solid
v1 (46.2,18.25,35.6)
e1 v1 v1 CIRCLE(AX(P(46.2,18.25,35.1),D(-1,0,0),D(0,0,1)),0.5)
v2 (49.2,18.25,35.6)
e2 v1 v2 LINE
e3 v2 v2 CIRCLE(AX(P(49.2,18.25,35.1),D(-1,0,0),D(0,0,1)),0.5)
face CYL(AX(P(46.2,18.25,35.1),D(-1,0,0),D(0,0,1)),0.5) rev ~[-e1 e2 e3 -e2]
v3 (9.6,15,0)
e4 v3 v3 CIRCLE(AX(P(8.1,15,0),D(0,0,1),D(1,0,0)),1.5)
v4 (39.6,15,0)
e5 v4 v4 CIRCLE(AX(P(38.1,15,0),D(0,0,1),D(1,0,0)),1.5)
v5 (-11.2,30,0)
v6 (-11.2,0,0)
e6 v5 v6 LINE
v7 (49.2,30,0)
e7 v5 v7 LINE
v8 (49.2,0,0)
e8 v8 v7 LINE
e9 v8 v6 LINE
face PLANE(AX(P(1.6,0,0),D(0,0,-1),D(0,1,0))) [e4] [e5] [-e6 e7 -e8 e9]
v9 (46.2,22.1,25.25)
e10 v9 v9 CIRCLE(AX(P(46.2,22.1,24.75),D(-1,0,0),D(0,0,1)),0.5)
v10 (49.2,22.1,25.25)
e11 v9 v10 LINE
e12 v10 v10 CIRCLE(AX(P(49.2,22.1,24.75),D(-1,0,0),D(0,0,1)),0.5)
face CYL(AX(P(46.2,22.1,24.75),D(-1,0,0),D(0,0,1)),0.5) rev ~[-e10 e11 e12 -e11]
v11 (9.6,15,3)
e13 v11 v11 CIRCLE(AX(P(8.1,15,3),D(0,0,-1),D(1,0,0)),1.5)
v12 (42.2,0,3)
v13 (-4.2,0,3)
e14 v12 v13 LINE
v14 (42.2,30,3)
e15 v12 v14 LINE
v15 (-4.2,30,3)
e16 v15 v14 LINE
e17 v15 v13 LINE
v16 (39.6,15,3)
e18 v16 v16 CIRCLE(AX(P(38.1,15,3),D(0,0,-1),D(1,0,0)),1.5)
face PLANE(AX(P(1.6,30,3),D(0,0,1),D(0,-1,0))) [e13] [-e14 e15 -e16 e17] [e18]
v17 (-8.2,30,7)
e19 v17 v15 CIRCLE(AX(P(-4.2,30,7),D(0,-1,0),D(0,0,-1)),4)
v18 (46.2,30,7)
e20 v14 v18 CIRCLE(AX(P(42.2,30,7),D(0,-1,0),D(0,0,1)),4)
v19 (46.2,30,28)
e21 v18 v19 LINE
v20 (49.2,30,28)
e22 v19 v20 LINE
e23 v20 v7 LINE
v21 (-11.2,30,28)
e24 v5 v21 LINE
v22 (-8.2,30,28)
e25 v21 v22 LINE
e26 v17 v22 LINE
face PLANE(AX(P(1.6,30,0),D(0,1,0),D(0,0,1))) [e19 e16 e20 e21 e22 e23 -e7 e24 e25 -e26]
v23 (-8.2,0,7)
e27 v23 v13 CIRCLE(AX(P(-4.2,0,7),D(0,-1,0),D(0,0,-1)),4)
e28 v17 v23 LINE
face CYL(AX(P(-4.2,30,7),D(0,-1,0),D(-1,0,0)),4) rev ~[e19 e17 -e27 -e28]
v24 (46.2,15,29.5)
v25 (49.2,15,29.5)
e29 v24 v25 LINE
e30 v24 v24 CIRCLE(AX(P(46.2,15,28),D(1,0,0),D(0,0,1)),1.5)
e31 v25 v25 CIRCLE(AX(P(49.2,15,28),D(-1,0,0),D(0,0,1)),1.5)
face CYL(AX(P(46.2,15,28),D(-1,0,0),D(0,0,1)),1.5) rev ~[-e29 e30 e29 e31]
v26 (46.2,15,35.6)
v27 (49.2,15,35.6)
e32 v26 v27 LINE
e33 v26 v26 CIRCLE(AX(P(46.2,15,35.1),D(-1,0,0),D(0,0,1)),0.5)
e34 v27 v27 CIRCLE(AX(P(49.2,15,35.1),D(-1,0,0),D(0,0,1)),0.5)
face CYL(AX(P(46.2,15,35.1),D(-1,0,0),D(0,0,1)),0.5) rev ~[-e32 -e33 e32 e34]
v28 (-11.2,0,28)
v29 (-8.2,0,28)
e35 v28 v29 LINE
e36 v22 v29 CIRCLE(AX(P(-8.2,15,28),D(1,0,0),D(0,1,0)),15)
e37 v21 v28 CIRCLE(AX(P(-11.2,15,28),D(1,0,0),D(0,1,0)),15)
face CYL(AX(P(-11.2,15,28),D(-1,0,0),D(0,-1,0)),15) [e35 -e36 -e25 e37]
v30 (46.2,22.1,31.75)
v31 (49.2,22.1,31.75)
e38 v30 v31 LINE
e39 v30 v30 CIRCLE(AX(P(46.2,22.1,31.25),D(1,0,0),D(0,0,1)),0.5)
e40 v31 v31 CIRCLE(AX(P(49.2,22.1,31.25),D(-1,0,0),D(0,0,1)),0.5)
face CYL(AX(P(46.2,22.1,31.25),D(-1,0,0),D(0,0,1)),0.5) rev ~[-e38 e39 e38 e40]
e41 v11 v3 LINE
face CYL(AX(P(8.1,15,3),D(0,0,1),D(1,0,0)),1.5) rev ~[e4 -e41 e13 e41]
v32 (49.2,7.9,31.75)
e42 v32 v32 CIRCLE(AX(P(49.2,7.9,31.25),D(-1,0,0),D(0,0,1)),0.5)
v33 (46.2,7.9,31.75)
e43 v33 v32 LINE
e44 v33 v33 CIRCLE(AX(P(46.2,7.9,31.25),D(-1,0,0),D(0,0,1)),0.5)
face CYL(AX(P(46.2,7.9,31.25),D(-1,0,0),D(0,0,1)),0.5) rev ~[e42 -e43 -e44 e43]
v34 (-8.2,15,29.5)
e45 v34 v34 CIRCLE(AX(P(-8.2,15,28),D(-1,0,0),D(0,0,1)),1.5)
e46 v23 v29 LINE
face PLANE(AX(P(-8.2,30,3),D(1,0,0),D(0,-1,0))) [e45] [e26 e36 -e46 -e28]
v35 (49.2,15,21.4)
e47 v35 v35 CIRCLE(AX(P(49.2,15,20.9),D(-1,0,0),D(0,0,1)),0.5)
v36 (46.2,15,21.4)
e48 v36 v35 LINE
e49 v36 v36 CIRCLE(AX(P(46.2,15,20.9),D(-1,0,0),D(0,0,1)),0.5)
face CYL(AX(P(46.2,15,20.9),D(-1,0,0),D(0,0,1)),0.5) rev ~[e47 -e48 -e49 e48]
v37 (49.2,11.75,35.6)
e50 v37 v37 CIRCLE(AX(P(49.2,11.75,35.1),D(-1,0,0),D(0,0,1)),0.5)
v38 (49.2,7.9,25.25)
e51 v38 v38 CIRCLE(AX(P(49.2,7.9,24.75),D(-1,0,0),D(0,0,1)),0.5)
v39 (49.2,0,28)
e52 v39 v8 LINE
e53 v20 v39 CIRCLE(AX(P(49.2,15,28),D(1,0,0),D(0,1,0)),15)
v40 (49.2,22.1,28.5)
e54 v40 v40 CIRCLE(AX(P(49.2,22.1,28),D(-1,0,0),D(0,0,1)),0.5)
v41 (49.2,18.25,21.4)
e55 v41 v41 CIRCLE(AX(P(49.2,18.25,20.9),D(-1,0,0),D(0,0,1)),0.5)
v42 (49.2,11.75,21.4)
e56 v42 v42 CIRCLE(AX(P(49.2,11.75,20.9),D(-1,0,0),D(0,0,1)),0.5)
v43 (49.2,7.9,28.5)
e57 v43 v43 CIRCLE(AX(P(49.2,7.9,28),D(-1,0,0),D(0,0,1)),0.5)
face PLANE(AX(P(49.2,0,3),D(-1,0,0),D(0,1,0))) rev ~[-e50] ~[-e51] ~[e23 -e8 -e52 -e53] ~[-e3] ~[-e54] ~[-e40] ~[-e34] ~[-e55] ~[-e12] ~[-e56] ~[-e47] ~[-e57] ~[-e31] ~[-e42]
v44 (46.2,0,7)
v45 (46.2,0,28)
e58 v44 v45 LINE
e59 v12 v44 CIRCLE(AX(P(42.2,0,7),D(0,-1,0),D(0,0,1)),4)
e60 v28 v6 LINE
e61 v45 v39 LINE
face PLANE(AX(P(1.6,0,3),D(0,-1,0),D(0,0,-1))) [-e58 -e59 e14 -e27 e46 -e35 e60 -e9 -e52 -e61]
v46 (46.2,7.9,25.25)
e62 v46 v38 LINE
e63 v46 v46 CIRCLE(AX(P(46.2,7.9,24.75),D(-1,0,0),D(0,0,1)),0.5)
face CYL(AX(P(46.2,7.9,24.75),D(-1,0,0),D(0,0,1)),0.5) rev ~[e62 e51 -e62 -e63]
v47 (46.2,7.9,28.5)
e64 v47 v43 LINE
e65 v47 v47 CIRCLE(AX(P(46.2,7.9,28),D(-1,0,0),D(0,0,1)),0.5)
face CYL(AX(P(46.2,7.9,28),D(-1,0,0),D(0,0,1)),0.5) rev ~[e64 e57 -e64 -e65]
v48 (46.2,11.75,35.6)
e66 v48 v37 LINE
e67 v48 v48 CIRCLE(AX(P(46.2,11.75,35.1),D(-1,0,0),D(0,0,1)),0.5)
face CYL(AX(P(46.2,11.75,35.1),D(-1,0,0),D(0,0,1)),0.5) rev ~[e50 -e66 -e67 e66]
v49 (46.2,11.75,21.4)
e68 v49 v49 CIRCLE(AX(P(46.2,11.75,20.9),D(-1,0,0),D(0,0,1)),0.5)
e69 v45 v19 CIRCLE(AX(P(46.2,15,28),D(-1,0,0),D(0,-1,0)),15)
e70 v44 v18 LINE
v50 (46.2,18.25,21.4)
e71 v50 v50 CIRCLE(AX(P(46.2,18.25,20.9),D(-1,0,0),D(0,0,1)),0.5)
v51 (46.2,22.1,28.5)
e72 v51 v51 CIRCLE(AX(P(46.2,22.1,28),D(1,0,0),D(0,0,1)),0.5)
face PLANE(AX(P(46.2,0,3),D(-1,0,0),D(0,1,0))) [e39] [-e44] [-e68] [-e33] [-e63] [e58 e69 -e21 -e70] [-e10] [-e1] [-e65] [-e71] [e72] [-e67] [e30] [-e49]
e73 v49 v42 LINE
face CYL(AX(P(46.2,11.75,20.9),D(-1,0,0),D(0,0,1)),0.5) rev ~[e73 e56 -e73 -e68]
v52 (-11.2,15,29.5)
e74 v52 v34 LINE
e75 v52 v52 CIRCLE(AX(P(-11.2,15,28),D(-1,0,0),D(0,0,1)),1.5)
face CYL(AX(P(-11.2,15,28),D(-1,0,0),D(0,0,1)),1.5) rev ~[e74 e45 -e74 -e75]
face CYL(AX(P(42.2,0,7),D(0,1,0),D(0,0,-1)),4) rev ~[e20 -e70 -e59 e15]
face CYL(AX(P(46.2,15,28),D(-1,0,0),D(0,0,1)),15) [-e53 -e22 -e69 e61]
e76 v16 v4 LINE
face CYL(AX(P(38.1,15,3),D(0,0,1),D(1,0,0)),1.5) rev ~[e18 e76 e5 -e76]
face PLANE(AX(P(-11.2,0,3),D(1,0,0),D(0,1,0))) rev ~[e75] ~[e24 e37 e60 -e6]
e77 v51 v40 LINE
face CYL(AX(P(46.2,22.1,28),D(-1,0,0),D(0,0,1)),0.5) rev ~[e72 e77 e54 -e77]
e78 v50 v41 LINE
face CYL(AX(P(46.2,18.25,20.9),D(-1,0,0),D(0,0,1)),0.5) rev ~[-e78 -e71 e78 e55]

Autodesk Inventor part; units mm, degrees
ref_plane "YZ Plane" through (0, 0, 0) normal (1, 0, 0) x (0, 1, 0)
ref_plane "XZ Plane" through (0, 0, 0) normal (0, 1, 0) x (-1, 0, 0)
ref_plane "XY Plane" through (0, 0, 0) normal (0, 0, 1) x (1, 0, 0)
sketch "Sketch1" plane through (0, 0, 0) normal (0, 0, 1) x (1, 0, 0)
  line L0 (0, 0) -> (46.2, 0)
  line L1 (46.2, 0) -> (46.2, 30)
  line L2 (46.2, 30) -> (0, 30)
  line L3 (0, 30) -> (0, 0)
  dimension "d0" = 46.2
  dimension "d1" = 30
extrude "Extrusion1" add sketch "Sketch1" along normal blind 3
sketch "Sketch2" plane through (0, 0, 3) normal (0, 0, 1) x (1, 0, 0)
  line L0 (0, 0) -> (46.2, 0) projected
  line L1 (0, 0) -> (0, 15)
  line L2 (0, 30) -> (0, 0) projected
  line L3 (0, 15) -> (23.1, 15)
  line L4 (46.2, 0) -> (46.2, 30) projected
  line L5 (23.1, 15) -> (38.1, 15)
  line L6 (23.1, 15) -> (8.1, 15)
  circle A0 centre (8.1, 15) radius 1.5
  circle A1 centre (38.1, 15) radius 1.5
  dimension "d4" = 15
  dimension "d5" = 23.1
  dimension "d6" = 15
  dimension "d7" = 15
  dimension "d8" = 3
  dimension "d9" = 3
extrude "Extrusion2" cut sketch "Sketch2" against normal blind 3
sketch "Sketch3" plane through (0, 0, 3) normal (0, 0, 1) x (1, 0, 0)
  circle A0 centre (38.1, 15) radius 1.5 projected
  circle A1 centre (8.1, 15) radius 1.5 projected
  line L0 (46.2, 0) -> (46.2, 30) projected
  line L1 (46.2, 30) -> (0, 30) projected
  line L2 (0, 30) -> (0, 0) projected
  line L3 (0, 0) -> (46.2, 0) projected
  circle A2 centre (38.1, 15) radius 3.5
  line L4 (38.1, 15) -> (41.6, 15)
  line L5 (41.6, 15) -> (42.6, 15)
  line L6 (42.6, 15) -> (45.6, 15)
  line L7 (45.6, 15) -> (45.6, 30)
  line L8 (45.6, 15) -> (45.6, 0)
  line L9 (0, 0) -> (46.2, 0) projected
  line L10 (45.6, 0) -> (46.2, 0)
  circle A3 centre (8.1, 15) radius 3.5
  line L11 (8.1, 15) -> (4.6, 15)
  line L12 (4.6, 15) -> (1.6, 15)
  line L13 (1.6, 15) -> (1.6, 30)
  line L14 (46.2, 30) -> (0, 30) projected
  line L15 (1.6, 30) -> (0, 30)
  line L16 (1.6, 15) -> (1.6, 0)
  dimension "d12" = 7
  dimension "d17" = 7
  dimension "d13" = 1
  dimension "d14" = 3
  dimension "d15" = 15
  dimension "d16" = 15
  dimension "d18" = 3
extrude "Extrusion6" cut sketch "Sketch3" against normal blind 40 contours L3 L2 L1 L13 L16
sketch "Sketch6" plane through (0, 0, 3) normal (0, 0, 1) x (1, 0, 0)
  line L0 (1.6, 30) -> (1.6, 0) projected
  line L1 (1.6, 0) -> (46.2, 0) projected
  line L2 (46.2, 0) -> (46.2, 30) projected
  line L3 (46.2, 30) -> (1.6, 30) projected
  circle A0 centre (8.1, 15) radius 1.5 projected
  circle A1 centre (38.1, 15) radius 1.5 projected
  line L4 (1.6, 0) -> (46.2, 0) projected
  line L5 (46.2, 0) -> (49.2, 0)
  line L6 (49.2, 0) -> (49.2, 30)
  line L7 (49.2, 30) -> (46.2, 30)
  point P0 (0, 0)
  dimension "d33" = 3
  dimension "d34" = 30
extrude "Extrusion7" add sketch "Sketch6" against normal blind 3 contours L7 L6 L5 L2
sketch "Sketch7" plane through (0, 0, 3) normal (0, 0, 1) x (1, 0, 0)
  line L0 (1.6, 30) -> (1.6, 0) projected
  line L1 (1.6, 0) -> (49.2, 0) projected
  line L2 (49.2, 0) -> (49.2, 30) projected
  line L3 (49.2, 30) -> (1.6, 30) projected
  circle A0 centre (8.1, 15) radius 1.5 projected
  circle A1 centre (38.1, 15) radius 1.5 projected
  line L4 (49.2, 30) -> (49.2, 0) projected
  line L5 (49.2, 0) -> (46.2, 0)
  line L6 (1.6, 0) -> (49.2, 0) projected
  line L7 (46.2, 0) -> (46.2, 30)
  line L8 (49.2, 30) -> (1.6, 30) projected
  line L9 (46.2, 30) -> (49.2, 30)
  point P0 (0, 0)
  dimension "d37" = 3
extrude "Extrusion8" add sketch "Sketch7" along normal blind 40 contours L3 L2 L1 L7
sketch "Sketch8" plane through (46.2, 0, 3) normal (-1, 0, 0) x (0, 0, 1)
  line L0 (0, 0) -> (0, 30) projected
  line L1 (0, 0) -> (40, 0) projected
  line L2 (40, 30) -> (40, 0) projected
  line L3 (0, 30) -> (40, 30) projected
  line L4 (0, 30) -> (0, 15)
  line L5 (0, 30) -> (0, 0) projected
  line L6 (0, 15) -> (25, 15)
  circle A0 centre (25, 15) radius 1.5
  circle A1 centre (25, 15) radius 15
  line L7 (-3, 30) -> (40, 30) projected
  line L8 (40, 0) -> (-3, 0) projected
  point P0 (25, 30)
  point P1 (25, 0)
  point P2 (40, 15)
  point P3 (25, 0)
  point P4 (25, 30)
  dimension "d40" = 15
  dimension "d41" = 25
  dimension "d42" = 3
extrude "Extrusion9" cut sketch "Sketch8" against normal blind 40 contours A1 L2 L1 | A1 L3 L2 | A0
fillet "Fillet1" radius 4 1 edges at (46.2, 15, 3)
sketch "Sketch9" plane through (46.2, 15, 28) normal (-1, 0, 0) x (0, 0, 1)
  line L0 (-21, -15) -> (-21, 15) projected
  line L1 (-21, -15) -> (0, -15) projected
  arc A0 (0, -15) -> (0, 15) centre (0, 0) ccw projected
  line L2 (-21, 15) -> (0, 15) projected
  circle A1 centre (0, 0) radius 1.5 projected
  line L3 (0, 0) -> (0, 7.1)
  line L4 (0, 7.1) -> (3.25, 7.1)
  line L5 (0, 7.1) -> (-3.25, 7.1)
  circle A2 centre (0, 7.1) radius 0.5
  circle A3 centre (3.25, 7.1) radius 0.5
  circle A4 centre (-3.25, 7.1) radius 0.5
  line L6 (0, 0) -> (4.7365, 0)
  line L7 (0, 0) -> (5.6569, 5.6569)
  line L8 (0, 0) -> (8, 0) construction
  circle A5 centre (0, -7.1) radius 0.5
  circle A6 centre (3.25, -7.1) radius 0.5
  circle A7 centre (-3.25, -7.1) radius 0.5
  circle A8 centre (7.1, 0) radius 0.5
  circle A9 centre (7.1, 3.25) radius 0.5
  circle A10 centre (7.1, -3.25) radius 0.5
  circle A11 centre (-7.1, -3.25) radius 0.5
  circle A12 centre (-7.1, 0) radius 0.5
  circle A13 centre (-7.1, 3.25) radius 0.5
  point P0 (-28, -15)
  dimension "d47" = 7.1
  dimension "d48" = 3.25
  dimension "d49" = 3.25
  dimension "d50" = 1
  dimension "d51" = 1
  dimension "d52" = 1
  dimension "d53" = 8
  dimension "d54" = 45
extrude "Extrusion10" cut sketch "Sketch9" against normal blind 40 contours A2 L5 L3 | L3 L4 A2 | L5 A2 L4 | A3 | A4 | A5 | A6 | A7 | A8 | A9 | A10 | A11 | A12 | A13
sketch "Sketch10" plane through (1.6, 0, 3) normal (-1, 0, 0) x (0, 0, 1)
  line L0 (-3, 0) -> (-3, 30) projected
  line L1 (0, 0) -> (-3, 0) projected
  line L2 (0, 30) -> (0, 0) projected
  line L3 (-3, 30) -> (0, 30) projected
  point P0 (-3, 0)
extrude "Extrusion11" add sketch "Sketch10" along normal blind 20
sketch "Sketch11" plane through (0, 0, 3) normal (0, 0, 1) x (1, 0, 0)
  line L0 (42.2, 30) -> (42.2, 0) projected
  line L1 (42.2, 30) -> (-18.4, 30) projected
  line L2 (-18.4, 0) -> (-18.4, 30) projected
  line L3 (-18.4, 0) -> (42.2, 0) projected
  circle A0 centre (8.1, 15) radius 1.5 projected
  circle A1 centre (38.1, 15) radius 1.5 projected
  line L4 (-18.4, 30) -> (49.2, 30) projected
  line L5 (-18.4, 30) -> (-8.2, 30)
  line L6 (-8.2, 30) -> (-8.2, 0)
  line L7 (-18.4, 0) -> (49.2, 0) projected
  line L8 (-8.2, 0) -> (-11.2, 0)
  line L9 (-11.2, 0) -> (-11.2, 30)
  point P0 (0, 0)
  point P1 (-8.2, 0)
  dimension "d59" = 10.2
  dimension "d60" = 3
extrude "Extrusion12" add sketch "Sketch11" along normal blind 40 contours L6 L3 L9 L1
sketch "Sketch12" plane through (-11.2, 0, 3) normal (-1, 0, 0) x (0, 0, 1)
  circle A0 centre (25, 15) radius 1.5 projected
  arc A1 (25, 0) -> (25, 30) centre (25, 15) ccw projected
  line L0 (0, 30) -> (40, 30) projected
  line L1 (25, 30) -> (40, 30)
  line L2 (40, 30) -> (40, 0) projected
  line L3 (40, 30) -> (40, 0)
  line L4 (40, 0) -> (25, 0)
  point P0 (-3, 0)
  point P1 (40, 15)
extrude "Extrusion13" cut sketch "Sketch12" against normal blind 4
sketch "Sketch13" plane through (0, 0, 3) normal (0, 0, 1) x (1, 0, 0)
  line L0 (-11.2, 0) -> (-11.2, 30) projected
  line L1 (-11.2, 30) -> (-18.4, 30) projected
  line L2 (-18.4, 0) -> (-18.4, 30) projected
  line L3 (-18.4, 0) -> (-11.2, 0) projected
  point P0 (0, 0)
extrude "Extrusion14" cut sketch "Sketch13" against normal blind 4
fillet "Fillet3" radius 4 1 edges at (-8.2, 15, 3)
properties part number "acople_1"
